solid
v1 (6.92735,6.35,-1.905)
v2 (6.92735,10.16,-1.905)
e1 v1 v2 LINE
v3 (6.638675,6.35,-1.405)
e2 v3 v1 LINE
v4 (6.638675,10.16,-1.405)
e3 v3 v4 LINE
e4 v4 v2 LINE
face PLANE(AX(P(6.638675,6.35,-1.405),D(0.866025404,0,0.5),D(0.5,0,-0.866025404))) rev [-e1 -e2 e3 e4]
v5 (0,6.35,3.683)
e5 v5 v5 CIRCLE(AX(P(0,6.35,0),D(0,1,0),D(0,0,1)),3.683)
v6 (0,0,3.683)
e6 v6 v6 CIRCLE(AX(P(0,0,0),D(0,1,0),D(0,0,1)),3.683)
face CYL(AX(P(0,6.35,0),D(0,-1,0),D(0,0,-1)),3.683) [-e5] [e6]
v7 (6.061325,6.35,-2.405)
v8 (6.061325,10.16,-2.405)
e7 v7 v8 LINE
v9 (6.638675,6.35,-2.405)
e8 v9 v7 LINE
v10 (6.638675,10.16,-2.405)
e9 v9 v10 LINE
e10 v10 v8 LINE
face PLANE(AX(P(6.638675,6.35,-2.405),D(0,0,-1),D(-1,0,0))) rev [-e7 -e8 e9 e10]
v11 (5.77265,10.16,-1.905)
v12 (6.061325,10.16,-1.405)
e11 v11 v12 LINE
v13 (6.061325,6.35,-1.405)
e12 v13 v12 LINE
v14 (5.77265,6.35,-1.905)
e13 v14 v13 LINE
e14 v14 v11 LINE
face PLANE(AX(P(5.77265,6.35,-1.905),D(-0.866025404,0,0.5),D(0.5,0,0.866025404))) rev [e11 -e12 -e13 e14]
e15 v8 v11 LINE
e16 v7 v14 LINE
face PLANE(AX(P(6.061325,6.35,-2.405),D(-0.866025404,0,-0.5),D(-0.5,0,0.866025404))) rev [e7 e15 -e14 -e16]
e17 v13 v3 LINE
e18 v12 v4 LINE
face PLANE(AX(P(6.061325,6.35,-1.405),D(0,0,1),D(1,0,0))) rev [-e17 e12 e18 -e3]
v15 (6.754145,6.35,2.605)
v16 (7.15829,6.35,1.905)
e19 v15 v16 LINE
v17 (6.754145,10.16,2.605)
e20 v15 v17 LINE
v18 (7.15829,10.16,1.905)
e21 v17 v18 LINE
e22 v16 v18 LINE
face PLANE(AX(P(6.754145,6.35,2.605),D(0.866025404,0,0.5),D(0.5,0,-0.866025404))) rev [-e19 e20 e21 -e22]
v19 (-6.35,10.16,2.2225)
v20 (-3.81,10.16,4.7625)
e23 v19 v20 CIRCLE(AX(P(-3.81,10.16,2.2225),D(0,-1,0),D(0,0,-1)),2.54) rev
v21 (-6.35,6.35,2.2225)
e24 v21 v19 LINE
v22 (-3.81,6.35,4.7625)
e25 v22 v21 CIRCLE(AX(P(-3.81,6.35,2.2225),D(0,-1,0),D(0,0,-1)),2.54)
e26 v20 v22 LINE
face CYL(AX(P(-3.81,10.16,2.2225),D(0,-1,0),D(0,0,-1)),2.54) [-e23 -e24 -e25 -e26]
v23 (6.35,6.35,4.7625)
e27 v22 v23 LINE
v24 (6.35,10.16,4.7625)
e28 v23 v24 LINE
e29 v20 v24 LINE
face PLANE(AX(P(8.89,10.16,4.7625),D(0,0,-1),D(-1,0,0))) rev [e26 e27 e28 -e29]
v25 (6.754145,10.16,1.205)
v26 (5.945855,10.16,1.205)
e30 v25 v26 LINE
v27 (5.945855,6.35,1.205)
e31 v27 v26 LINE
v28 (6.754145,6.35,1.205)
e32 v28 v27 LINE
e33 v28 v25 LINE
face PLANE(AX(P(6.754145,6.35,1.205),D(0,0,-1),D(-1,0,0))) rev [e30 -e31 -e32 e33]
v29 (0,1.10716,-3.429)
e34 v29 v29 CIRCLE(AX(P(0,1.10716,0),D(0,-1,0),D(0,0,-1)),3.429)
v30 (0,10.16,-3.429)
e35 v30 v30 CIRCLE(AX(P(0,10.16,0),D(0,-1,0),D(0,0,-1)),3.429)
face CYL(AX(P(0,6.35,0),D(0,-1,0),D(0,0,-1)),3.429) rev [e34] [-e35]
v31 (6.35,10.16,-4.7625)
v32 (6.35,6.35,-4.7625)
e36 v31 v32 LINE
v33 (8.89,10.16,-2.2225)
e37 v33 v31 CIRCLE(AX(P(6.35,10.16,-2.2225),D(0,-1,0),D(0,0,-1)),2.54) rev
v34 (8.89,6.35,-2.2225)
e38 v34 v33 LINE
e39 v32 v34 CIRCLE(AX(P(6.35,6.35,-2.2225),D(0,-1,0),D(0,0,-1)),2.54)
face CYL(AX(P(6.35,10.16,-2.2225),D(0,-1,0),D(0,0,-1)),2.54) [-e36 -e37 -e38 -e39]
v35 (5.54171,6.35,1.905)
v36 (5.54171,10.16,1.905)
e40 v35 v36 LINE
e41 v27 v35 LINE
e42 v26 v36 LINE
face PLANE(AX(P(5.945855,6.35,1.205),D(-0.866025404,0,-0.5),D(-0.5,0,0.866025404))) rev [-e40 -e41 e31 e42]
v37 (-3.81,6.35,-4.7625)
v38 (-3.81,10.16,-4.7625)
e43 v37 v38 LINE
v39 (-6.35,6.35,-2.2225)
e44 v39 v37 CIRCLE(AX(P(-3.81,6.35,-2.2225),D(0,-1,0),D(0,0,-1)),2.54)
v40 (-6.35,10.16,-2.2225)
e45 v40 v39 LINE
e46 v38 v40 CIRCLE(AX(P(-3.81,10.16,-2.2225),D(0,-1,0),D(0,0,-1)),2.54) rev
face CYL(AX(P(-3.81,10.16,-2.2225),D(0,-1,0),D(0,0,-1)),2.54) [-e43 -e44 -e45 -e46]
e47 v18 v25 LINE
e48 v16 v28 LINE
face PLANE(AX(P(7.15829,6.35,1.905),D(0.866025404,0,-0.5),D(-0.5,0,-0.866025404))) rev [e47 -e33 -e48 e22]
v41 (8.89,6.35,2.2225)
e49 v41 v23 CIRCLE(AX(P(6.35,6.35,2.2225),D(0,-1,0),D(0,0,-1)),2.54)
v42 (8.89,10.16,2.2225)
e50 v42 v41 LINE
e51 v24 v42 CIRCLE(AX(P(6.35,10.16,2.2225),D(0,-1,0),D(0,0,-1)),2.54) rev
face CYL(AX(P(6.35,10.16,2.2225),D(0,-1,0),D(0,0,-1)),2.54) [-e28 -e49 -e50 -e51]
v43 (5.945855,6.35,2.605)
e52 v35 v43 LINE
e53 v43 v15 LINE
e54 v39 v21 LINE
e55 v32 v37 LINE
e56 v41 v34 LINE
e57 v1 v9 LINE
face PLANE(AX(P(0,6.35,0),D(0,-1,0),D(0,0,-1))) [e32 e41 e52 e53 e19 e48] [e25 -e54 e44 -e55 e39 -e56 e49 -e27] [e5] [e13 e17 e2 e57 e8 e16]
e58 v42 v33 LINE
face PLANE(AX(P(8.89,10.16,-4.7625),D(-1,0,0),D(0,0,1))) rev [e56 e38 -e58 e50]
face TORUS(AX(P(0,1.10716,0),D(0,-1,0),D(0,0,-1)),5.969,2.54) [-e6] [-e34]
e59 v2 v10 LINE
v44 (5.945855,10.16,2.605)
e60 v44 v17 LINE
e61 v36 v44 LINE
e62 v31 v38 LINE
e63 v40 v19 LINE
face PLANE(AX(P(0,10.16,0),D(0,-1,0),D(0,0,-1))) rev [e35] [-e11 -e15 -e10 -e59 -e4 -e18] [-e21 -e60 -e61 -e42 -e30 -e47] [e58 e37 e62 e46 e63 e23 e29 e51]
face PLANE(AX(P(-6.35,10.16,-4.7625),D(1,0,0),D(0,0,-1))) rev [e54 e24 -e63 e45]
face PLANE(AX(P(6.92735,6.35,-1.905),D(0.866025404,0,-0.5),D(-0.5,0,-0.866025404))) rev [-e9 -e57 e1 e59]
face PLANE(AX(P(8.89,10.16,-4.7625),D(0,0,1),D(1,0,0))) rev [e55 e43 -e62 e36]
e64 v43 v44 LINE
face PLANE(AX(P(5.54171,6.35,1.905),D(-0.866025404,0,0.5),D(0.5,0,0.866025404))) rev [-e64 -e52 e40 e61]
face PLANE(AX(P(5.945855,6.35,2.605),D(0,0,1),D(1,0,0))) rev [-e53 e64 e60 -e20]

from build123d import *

# Parameters (mm, degrees)
SKETCH1_R           = 3.683
SKETCH1_R_2         = 3.4290000000000003
BOSS_EXTRUDE1_DEPTH = 6.35
FILLET1_R           = 2.54
BOSS_EXTRUDE2_DEPTH = 3.8099999999999996
SKETCH3_R           = 3.4290000000000003
CUT_EXTRUDE1_DEPTH  = 12.917885980743574
CUT_EXTRUDE2_DEPTH  = 3.8099999999999996
FILLET2_R           = 2.54


with BuildPart() as part:
    # Sketch1 → Boss-Extrude1 (new body)
    with BuildSketch(Plane(origin=(0, 0, 0), x_dir=(1, 0, 0), z_dir=(0, 1, 0))):
        with Locations(Location((0, 0, 0), (0, 0, 270))):
            Circle(SKETCH1_R)
        with Locations(Location((0, 0, 0), (0, 0, 270))):
            Circle(SKETCH1_R_2, mode=Mode.SUBTRACT)
    extrude(amount=BOSS_EXTRUDE1_DEPTH)

    # Fillet1
    # the kernel refuses this fillet: 2.54 mm, written as the material it takes off along each edge
    with BuildSketch(Plane(origin=(0, 0, 0), x_dir=(-1.8e-16, 0, 1), z_dir=(-1, 0, -1.8e-16))) as fillet1_piece_1:
        with BuildLine():
            CenterArc((5.968999999999999, 1.107160331659332), FILLET1_R, 180, 25.841932763167165)
            Line((3.683, 0), (3.6372799999999996, -0.02214320663318664))
            ThreePointArc((3.6372799999999996, -0.02214320663318664), (3.556, -0.0508), (3.4290000000000003, -0.0508))
            Line((3.4290000000000003, -0.0508), (3.3782, 0))
            Line((3.3782, 0), (3.378199999999999, 1.107160331659332))
            Line((3.378199999999999, 1.107160331659332), (3.4289999999999994, 1.107160331659332))
        make_face()
    revolve(axis=Axis((0, 0, 0), (0, 1, 0)), mode=Mode.SUBTRACT)

    # Sketch2 → Boss-Extrude2 (add)
    with BuildSketch(Plane(origin=(0, 6.35, 0), x_dir=(1, 0, 0), z_dir=(0, 1, 0))):
        Polygon((8.89, 4.762500000000003), (-6.349999999999998, 4.762499999999998), (-6.349999999999998, -4.762500000000002), (8.890000000000002, -4.7624999999999975), align=None)
    extrude(amount=BOSS_EXTRUDE2_DEPTH)

    # Sketch3 → Cut-Extrude1 (cut, through all)
    with BuildSketch(Plane.XZ.offset(-6.35)):
        with Locations(Location((0, 0, 0), (0, 0, 270))):
            Circle(SKETCH3_R)
    extrude(amount=-CUT_EXTRUDE1_DEPTH, mode=Mode.SUBTRACT)

    # Sketch4 → Cut-Extrude2 (cut)
    with BuildSketch(Plane(origin=(0, 10.159999999999998, 0), x_dir=(1, 0, 0), z_dir=(0, 1, 0))):
        Polygon((6.061324865405188, 1.4049999999999996), (6.638675134594815, 1.4049999999999996), (6.927350269189628, 1.9049999999999978), (6.638675134594814, 2.4049999999999994), (6.061324865405189, 2.4049999999999994), (5.772649730810376, 1.9049999999999991), align=None)
        Polygon((7.158290376865474, -1.9049999999999991), (6.754145188432737, -1.2050000000000012), (5.945854811567263, -1.2050000000000012), (5.541709623134526, -1.904999999999999), (5.945854811567265, -2.6049999999999995), (6.754145188432736, -2.6049999999999995), align=None)
    extrude(amount=-CUT_EXTRUDE2_DEPTH, mode=Mode.SUBTRACT)

    # Fillet2
    fillet2_edges = [part.edges().sort_by_distance(p)[0] for p in [
        (-6.349999999999998, 8.254999999999999, -4.762499999999998),
        (-6.349999999999998, 8.254999999999999, 4.762500000000002),
        (8.890000000000002, 8.254999999999999, 4.7624999999999975),
        (8.89, 8.254999999999999, -4.762500000000003),
    ]]
    fillet(fillet2_edges, radius=FILLET2_R)


solid = part.part
